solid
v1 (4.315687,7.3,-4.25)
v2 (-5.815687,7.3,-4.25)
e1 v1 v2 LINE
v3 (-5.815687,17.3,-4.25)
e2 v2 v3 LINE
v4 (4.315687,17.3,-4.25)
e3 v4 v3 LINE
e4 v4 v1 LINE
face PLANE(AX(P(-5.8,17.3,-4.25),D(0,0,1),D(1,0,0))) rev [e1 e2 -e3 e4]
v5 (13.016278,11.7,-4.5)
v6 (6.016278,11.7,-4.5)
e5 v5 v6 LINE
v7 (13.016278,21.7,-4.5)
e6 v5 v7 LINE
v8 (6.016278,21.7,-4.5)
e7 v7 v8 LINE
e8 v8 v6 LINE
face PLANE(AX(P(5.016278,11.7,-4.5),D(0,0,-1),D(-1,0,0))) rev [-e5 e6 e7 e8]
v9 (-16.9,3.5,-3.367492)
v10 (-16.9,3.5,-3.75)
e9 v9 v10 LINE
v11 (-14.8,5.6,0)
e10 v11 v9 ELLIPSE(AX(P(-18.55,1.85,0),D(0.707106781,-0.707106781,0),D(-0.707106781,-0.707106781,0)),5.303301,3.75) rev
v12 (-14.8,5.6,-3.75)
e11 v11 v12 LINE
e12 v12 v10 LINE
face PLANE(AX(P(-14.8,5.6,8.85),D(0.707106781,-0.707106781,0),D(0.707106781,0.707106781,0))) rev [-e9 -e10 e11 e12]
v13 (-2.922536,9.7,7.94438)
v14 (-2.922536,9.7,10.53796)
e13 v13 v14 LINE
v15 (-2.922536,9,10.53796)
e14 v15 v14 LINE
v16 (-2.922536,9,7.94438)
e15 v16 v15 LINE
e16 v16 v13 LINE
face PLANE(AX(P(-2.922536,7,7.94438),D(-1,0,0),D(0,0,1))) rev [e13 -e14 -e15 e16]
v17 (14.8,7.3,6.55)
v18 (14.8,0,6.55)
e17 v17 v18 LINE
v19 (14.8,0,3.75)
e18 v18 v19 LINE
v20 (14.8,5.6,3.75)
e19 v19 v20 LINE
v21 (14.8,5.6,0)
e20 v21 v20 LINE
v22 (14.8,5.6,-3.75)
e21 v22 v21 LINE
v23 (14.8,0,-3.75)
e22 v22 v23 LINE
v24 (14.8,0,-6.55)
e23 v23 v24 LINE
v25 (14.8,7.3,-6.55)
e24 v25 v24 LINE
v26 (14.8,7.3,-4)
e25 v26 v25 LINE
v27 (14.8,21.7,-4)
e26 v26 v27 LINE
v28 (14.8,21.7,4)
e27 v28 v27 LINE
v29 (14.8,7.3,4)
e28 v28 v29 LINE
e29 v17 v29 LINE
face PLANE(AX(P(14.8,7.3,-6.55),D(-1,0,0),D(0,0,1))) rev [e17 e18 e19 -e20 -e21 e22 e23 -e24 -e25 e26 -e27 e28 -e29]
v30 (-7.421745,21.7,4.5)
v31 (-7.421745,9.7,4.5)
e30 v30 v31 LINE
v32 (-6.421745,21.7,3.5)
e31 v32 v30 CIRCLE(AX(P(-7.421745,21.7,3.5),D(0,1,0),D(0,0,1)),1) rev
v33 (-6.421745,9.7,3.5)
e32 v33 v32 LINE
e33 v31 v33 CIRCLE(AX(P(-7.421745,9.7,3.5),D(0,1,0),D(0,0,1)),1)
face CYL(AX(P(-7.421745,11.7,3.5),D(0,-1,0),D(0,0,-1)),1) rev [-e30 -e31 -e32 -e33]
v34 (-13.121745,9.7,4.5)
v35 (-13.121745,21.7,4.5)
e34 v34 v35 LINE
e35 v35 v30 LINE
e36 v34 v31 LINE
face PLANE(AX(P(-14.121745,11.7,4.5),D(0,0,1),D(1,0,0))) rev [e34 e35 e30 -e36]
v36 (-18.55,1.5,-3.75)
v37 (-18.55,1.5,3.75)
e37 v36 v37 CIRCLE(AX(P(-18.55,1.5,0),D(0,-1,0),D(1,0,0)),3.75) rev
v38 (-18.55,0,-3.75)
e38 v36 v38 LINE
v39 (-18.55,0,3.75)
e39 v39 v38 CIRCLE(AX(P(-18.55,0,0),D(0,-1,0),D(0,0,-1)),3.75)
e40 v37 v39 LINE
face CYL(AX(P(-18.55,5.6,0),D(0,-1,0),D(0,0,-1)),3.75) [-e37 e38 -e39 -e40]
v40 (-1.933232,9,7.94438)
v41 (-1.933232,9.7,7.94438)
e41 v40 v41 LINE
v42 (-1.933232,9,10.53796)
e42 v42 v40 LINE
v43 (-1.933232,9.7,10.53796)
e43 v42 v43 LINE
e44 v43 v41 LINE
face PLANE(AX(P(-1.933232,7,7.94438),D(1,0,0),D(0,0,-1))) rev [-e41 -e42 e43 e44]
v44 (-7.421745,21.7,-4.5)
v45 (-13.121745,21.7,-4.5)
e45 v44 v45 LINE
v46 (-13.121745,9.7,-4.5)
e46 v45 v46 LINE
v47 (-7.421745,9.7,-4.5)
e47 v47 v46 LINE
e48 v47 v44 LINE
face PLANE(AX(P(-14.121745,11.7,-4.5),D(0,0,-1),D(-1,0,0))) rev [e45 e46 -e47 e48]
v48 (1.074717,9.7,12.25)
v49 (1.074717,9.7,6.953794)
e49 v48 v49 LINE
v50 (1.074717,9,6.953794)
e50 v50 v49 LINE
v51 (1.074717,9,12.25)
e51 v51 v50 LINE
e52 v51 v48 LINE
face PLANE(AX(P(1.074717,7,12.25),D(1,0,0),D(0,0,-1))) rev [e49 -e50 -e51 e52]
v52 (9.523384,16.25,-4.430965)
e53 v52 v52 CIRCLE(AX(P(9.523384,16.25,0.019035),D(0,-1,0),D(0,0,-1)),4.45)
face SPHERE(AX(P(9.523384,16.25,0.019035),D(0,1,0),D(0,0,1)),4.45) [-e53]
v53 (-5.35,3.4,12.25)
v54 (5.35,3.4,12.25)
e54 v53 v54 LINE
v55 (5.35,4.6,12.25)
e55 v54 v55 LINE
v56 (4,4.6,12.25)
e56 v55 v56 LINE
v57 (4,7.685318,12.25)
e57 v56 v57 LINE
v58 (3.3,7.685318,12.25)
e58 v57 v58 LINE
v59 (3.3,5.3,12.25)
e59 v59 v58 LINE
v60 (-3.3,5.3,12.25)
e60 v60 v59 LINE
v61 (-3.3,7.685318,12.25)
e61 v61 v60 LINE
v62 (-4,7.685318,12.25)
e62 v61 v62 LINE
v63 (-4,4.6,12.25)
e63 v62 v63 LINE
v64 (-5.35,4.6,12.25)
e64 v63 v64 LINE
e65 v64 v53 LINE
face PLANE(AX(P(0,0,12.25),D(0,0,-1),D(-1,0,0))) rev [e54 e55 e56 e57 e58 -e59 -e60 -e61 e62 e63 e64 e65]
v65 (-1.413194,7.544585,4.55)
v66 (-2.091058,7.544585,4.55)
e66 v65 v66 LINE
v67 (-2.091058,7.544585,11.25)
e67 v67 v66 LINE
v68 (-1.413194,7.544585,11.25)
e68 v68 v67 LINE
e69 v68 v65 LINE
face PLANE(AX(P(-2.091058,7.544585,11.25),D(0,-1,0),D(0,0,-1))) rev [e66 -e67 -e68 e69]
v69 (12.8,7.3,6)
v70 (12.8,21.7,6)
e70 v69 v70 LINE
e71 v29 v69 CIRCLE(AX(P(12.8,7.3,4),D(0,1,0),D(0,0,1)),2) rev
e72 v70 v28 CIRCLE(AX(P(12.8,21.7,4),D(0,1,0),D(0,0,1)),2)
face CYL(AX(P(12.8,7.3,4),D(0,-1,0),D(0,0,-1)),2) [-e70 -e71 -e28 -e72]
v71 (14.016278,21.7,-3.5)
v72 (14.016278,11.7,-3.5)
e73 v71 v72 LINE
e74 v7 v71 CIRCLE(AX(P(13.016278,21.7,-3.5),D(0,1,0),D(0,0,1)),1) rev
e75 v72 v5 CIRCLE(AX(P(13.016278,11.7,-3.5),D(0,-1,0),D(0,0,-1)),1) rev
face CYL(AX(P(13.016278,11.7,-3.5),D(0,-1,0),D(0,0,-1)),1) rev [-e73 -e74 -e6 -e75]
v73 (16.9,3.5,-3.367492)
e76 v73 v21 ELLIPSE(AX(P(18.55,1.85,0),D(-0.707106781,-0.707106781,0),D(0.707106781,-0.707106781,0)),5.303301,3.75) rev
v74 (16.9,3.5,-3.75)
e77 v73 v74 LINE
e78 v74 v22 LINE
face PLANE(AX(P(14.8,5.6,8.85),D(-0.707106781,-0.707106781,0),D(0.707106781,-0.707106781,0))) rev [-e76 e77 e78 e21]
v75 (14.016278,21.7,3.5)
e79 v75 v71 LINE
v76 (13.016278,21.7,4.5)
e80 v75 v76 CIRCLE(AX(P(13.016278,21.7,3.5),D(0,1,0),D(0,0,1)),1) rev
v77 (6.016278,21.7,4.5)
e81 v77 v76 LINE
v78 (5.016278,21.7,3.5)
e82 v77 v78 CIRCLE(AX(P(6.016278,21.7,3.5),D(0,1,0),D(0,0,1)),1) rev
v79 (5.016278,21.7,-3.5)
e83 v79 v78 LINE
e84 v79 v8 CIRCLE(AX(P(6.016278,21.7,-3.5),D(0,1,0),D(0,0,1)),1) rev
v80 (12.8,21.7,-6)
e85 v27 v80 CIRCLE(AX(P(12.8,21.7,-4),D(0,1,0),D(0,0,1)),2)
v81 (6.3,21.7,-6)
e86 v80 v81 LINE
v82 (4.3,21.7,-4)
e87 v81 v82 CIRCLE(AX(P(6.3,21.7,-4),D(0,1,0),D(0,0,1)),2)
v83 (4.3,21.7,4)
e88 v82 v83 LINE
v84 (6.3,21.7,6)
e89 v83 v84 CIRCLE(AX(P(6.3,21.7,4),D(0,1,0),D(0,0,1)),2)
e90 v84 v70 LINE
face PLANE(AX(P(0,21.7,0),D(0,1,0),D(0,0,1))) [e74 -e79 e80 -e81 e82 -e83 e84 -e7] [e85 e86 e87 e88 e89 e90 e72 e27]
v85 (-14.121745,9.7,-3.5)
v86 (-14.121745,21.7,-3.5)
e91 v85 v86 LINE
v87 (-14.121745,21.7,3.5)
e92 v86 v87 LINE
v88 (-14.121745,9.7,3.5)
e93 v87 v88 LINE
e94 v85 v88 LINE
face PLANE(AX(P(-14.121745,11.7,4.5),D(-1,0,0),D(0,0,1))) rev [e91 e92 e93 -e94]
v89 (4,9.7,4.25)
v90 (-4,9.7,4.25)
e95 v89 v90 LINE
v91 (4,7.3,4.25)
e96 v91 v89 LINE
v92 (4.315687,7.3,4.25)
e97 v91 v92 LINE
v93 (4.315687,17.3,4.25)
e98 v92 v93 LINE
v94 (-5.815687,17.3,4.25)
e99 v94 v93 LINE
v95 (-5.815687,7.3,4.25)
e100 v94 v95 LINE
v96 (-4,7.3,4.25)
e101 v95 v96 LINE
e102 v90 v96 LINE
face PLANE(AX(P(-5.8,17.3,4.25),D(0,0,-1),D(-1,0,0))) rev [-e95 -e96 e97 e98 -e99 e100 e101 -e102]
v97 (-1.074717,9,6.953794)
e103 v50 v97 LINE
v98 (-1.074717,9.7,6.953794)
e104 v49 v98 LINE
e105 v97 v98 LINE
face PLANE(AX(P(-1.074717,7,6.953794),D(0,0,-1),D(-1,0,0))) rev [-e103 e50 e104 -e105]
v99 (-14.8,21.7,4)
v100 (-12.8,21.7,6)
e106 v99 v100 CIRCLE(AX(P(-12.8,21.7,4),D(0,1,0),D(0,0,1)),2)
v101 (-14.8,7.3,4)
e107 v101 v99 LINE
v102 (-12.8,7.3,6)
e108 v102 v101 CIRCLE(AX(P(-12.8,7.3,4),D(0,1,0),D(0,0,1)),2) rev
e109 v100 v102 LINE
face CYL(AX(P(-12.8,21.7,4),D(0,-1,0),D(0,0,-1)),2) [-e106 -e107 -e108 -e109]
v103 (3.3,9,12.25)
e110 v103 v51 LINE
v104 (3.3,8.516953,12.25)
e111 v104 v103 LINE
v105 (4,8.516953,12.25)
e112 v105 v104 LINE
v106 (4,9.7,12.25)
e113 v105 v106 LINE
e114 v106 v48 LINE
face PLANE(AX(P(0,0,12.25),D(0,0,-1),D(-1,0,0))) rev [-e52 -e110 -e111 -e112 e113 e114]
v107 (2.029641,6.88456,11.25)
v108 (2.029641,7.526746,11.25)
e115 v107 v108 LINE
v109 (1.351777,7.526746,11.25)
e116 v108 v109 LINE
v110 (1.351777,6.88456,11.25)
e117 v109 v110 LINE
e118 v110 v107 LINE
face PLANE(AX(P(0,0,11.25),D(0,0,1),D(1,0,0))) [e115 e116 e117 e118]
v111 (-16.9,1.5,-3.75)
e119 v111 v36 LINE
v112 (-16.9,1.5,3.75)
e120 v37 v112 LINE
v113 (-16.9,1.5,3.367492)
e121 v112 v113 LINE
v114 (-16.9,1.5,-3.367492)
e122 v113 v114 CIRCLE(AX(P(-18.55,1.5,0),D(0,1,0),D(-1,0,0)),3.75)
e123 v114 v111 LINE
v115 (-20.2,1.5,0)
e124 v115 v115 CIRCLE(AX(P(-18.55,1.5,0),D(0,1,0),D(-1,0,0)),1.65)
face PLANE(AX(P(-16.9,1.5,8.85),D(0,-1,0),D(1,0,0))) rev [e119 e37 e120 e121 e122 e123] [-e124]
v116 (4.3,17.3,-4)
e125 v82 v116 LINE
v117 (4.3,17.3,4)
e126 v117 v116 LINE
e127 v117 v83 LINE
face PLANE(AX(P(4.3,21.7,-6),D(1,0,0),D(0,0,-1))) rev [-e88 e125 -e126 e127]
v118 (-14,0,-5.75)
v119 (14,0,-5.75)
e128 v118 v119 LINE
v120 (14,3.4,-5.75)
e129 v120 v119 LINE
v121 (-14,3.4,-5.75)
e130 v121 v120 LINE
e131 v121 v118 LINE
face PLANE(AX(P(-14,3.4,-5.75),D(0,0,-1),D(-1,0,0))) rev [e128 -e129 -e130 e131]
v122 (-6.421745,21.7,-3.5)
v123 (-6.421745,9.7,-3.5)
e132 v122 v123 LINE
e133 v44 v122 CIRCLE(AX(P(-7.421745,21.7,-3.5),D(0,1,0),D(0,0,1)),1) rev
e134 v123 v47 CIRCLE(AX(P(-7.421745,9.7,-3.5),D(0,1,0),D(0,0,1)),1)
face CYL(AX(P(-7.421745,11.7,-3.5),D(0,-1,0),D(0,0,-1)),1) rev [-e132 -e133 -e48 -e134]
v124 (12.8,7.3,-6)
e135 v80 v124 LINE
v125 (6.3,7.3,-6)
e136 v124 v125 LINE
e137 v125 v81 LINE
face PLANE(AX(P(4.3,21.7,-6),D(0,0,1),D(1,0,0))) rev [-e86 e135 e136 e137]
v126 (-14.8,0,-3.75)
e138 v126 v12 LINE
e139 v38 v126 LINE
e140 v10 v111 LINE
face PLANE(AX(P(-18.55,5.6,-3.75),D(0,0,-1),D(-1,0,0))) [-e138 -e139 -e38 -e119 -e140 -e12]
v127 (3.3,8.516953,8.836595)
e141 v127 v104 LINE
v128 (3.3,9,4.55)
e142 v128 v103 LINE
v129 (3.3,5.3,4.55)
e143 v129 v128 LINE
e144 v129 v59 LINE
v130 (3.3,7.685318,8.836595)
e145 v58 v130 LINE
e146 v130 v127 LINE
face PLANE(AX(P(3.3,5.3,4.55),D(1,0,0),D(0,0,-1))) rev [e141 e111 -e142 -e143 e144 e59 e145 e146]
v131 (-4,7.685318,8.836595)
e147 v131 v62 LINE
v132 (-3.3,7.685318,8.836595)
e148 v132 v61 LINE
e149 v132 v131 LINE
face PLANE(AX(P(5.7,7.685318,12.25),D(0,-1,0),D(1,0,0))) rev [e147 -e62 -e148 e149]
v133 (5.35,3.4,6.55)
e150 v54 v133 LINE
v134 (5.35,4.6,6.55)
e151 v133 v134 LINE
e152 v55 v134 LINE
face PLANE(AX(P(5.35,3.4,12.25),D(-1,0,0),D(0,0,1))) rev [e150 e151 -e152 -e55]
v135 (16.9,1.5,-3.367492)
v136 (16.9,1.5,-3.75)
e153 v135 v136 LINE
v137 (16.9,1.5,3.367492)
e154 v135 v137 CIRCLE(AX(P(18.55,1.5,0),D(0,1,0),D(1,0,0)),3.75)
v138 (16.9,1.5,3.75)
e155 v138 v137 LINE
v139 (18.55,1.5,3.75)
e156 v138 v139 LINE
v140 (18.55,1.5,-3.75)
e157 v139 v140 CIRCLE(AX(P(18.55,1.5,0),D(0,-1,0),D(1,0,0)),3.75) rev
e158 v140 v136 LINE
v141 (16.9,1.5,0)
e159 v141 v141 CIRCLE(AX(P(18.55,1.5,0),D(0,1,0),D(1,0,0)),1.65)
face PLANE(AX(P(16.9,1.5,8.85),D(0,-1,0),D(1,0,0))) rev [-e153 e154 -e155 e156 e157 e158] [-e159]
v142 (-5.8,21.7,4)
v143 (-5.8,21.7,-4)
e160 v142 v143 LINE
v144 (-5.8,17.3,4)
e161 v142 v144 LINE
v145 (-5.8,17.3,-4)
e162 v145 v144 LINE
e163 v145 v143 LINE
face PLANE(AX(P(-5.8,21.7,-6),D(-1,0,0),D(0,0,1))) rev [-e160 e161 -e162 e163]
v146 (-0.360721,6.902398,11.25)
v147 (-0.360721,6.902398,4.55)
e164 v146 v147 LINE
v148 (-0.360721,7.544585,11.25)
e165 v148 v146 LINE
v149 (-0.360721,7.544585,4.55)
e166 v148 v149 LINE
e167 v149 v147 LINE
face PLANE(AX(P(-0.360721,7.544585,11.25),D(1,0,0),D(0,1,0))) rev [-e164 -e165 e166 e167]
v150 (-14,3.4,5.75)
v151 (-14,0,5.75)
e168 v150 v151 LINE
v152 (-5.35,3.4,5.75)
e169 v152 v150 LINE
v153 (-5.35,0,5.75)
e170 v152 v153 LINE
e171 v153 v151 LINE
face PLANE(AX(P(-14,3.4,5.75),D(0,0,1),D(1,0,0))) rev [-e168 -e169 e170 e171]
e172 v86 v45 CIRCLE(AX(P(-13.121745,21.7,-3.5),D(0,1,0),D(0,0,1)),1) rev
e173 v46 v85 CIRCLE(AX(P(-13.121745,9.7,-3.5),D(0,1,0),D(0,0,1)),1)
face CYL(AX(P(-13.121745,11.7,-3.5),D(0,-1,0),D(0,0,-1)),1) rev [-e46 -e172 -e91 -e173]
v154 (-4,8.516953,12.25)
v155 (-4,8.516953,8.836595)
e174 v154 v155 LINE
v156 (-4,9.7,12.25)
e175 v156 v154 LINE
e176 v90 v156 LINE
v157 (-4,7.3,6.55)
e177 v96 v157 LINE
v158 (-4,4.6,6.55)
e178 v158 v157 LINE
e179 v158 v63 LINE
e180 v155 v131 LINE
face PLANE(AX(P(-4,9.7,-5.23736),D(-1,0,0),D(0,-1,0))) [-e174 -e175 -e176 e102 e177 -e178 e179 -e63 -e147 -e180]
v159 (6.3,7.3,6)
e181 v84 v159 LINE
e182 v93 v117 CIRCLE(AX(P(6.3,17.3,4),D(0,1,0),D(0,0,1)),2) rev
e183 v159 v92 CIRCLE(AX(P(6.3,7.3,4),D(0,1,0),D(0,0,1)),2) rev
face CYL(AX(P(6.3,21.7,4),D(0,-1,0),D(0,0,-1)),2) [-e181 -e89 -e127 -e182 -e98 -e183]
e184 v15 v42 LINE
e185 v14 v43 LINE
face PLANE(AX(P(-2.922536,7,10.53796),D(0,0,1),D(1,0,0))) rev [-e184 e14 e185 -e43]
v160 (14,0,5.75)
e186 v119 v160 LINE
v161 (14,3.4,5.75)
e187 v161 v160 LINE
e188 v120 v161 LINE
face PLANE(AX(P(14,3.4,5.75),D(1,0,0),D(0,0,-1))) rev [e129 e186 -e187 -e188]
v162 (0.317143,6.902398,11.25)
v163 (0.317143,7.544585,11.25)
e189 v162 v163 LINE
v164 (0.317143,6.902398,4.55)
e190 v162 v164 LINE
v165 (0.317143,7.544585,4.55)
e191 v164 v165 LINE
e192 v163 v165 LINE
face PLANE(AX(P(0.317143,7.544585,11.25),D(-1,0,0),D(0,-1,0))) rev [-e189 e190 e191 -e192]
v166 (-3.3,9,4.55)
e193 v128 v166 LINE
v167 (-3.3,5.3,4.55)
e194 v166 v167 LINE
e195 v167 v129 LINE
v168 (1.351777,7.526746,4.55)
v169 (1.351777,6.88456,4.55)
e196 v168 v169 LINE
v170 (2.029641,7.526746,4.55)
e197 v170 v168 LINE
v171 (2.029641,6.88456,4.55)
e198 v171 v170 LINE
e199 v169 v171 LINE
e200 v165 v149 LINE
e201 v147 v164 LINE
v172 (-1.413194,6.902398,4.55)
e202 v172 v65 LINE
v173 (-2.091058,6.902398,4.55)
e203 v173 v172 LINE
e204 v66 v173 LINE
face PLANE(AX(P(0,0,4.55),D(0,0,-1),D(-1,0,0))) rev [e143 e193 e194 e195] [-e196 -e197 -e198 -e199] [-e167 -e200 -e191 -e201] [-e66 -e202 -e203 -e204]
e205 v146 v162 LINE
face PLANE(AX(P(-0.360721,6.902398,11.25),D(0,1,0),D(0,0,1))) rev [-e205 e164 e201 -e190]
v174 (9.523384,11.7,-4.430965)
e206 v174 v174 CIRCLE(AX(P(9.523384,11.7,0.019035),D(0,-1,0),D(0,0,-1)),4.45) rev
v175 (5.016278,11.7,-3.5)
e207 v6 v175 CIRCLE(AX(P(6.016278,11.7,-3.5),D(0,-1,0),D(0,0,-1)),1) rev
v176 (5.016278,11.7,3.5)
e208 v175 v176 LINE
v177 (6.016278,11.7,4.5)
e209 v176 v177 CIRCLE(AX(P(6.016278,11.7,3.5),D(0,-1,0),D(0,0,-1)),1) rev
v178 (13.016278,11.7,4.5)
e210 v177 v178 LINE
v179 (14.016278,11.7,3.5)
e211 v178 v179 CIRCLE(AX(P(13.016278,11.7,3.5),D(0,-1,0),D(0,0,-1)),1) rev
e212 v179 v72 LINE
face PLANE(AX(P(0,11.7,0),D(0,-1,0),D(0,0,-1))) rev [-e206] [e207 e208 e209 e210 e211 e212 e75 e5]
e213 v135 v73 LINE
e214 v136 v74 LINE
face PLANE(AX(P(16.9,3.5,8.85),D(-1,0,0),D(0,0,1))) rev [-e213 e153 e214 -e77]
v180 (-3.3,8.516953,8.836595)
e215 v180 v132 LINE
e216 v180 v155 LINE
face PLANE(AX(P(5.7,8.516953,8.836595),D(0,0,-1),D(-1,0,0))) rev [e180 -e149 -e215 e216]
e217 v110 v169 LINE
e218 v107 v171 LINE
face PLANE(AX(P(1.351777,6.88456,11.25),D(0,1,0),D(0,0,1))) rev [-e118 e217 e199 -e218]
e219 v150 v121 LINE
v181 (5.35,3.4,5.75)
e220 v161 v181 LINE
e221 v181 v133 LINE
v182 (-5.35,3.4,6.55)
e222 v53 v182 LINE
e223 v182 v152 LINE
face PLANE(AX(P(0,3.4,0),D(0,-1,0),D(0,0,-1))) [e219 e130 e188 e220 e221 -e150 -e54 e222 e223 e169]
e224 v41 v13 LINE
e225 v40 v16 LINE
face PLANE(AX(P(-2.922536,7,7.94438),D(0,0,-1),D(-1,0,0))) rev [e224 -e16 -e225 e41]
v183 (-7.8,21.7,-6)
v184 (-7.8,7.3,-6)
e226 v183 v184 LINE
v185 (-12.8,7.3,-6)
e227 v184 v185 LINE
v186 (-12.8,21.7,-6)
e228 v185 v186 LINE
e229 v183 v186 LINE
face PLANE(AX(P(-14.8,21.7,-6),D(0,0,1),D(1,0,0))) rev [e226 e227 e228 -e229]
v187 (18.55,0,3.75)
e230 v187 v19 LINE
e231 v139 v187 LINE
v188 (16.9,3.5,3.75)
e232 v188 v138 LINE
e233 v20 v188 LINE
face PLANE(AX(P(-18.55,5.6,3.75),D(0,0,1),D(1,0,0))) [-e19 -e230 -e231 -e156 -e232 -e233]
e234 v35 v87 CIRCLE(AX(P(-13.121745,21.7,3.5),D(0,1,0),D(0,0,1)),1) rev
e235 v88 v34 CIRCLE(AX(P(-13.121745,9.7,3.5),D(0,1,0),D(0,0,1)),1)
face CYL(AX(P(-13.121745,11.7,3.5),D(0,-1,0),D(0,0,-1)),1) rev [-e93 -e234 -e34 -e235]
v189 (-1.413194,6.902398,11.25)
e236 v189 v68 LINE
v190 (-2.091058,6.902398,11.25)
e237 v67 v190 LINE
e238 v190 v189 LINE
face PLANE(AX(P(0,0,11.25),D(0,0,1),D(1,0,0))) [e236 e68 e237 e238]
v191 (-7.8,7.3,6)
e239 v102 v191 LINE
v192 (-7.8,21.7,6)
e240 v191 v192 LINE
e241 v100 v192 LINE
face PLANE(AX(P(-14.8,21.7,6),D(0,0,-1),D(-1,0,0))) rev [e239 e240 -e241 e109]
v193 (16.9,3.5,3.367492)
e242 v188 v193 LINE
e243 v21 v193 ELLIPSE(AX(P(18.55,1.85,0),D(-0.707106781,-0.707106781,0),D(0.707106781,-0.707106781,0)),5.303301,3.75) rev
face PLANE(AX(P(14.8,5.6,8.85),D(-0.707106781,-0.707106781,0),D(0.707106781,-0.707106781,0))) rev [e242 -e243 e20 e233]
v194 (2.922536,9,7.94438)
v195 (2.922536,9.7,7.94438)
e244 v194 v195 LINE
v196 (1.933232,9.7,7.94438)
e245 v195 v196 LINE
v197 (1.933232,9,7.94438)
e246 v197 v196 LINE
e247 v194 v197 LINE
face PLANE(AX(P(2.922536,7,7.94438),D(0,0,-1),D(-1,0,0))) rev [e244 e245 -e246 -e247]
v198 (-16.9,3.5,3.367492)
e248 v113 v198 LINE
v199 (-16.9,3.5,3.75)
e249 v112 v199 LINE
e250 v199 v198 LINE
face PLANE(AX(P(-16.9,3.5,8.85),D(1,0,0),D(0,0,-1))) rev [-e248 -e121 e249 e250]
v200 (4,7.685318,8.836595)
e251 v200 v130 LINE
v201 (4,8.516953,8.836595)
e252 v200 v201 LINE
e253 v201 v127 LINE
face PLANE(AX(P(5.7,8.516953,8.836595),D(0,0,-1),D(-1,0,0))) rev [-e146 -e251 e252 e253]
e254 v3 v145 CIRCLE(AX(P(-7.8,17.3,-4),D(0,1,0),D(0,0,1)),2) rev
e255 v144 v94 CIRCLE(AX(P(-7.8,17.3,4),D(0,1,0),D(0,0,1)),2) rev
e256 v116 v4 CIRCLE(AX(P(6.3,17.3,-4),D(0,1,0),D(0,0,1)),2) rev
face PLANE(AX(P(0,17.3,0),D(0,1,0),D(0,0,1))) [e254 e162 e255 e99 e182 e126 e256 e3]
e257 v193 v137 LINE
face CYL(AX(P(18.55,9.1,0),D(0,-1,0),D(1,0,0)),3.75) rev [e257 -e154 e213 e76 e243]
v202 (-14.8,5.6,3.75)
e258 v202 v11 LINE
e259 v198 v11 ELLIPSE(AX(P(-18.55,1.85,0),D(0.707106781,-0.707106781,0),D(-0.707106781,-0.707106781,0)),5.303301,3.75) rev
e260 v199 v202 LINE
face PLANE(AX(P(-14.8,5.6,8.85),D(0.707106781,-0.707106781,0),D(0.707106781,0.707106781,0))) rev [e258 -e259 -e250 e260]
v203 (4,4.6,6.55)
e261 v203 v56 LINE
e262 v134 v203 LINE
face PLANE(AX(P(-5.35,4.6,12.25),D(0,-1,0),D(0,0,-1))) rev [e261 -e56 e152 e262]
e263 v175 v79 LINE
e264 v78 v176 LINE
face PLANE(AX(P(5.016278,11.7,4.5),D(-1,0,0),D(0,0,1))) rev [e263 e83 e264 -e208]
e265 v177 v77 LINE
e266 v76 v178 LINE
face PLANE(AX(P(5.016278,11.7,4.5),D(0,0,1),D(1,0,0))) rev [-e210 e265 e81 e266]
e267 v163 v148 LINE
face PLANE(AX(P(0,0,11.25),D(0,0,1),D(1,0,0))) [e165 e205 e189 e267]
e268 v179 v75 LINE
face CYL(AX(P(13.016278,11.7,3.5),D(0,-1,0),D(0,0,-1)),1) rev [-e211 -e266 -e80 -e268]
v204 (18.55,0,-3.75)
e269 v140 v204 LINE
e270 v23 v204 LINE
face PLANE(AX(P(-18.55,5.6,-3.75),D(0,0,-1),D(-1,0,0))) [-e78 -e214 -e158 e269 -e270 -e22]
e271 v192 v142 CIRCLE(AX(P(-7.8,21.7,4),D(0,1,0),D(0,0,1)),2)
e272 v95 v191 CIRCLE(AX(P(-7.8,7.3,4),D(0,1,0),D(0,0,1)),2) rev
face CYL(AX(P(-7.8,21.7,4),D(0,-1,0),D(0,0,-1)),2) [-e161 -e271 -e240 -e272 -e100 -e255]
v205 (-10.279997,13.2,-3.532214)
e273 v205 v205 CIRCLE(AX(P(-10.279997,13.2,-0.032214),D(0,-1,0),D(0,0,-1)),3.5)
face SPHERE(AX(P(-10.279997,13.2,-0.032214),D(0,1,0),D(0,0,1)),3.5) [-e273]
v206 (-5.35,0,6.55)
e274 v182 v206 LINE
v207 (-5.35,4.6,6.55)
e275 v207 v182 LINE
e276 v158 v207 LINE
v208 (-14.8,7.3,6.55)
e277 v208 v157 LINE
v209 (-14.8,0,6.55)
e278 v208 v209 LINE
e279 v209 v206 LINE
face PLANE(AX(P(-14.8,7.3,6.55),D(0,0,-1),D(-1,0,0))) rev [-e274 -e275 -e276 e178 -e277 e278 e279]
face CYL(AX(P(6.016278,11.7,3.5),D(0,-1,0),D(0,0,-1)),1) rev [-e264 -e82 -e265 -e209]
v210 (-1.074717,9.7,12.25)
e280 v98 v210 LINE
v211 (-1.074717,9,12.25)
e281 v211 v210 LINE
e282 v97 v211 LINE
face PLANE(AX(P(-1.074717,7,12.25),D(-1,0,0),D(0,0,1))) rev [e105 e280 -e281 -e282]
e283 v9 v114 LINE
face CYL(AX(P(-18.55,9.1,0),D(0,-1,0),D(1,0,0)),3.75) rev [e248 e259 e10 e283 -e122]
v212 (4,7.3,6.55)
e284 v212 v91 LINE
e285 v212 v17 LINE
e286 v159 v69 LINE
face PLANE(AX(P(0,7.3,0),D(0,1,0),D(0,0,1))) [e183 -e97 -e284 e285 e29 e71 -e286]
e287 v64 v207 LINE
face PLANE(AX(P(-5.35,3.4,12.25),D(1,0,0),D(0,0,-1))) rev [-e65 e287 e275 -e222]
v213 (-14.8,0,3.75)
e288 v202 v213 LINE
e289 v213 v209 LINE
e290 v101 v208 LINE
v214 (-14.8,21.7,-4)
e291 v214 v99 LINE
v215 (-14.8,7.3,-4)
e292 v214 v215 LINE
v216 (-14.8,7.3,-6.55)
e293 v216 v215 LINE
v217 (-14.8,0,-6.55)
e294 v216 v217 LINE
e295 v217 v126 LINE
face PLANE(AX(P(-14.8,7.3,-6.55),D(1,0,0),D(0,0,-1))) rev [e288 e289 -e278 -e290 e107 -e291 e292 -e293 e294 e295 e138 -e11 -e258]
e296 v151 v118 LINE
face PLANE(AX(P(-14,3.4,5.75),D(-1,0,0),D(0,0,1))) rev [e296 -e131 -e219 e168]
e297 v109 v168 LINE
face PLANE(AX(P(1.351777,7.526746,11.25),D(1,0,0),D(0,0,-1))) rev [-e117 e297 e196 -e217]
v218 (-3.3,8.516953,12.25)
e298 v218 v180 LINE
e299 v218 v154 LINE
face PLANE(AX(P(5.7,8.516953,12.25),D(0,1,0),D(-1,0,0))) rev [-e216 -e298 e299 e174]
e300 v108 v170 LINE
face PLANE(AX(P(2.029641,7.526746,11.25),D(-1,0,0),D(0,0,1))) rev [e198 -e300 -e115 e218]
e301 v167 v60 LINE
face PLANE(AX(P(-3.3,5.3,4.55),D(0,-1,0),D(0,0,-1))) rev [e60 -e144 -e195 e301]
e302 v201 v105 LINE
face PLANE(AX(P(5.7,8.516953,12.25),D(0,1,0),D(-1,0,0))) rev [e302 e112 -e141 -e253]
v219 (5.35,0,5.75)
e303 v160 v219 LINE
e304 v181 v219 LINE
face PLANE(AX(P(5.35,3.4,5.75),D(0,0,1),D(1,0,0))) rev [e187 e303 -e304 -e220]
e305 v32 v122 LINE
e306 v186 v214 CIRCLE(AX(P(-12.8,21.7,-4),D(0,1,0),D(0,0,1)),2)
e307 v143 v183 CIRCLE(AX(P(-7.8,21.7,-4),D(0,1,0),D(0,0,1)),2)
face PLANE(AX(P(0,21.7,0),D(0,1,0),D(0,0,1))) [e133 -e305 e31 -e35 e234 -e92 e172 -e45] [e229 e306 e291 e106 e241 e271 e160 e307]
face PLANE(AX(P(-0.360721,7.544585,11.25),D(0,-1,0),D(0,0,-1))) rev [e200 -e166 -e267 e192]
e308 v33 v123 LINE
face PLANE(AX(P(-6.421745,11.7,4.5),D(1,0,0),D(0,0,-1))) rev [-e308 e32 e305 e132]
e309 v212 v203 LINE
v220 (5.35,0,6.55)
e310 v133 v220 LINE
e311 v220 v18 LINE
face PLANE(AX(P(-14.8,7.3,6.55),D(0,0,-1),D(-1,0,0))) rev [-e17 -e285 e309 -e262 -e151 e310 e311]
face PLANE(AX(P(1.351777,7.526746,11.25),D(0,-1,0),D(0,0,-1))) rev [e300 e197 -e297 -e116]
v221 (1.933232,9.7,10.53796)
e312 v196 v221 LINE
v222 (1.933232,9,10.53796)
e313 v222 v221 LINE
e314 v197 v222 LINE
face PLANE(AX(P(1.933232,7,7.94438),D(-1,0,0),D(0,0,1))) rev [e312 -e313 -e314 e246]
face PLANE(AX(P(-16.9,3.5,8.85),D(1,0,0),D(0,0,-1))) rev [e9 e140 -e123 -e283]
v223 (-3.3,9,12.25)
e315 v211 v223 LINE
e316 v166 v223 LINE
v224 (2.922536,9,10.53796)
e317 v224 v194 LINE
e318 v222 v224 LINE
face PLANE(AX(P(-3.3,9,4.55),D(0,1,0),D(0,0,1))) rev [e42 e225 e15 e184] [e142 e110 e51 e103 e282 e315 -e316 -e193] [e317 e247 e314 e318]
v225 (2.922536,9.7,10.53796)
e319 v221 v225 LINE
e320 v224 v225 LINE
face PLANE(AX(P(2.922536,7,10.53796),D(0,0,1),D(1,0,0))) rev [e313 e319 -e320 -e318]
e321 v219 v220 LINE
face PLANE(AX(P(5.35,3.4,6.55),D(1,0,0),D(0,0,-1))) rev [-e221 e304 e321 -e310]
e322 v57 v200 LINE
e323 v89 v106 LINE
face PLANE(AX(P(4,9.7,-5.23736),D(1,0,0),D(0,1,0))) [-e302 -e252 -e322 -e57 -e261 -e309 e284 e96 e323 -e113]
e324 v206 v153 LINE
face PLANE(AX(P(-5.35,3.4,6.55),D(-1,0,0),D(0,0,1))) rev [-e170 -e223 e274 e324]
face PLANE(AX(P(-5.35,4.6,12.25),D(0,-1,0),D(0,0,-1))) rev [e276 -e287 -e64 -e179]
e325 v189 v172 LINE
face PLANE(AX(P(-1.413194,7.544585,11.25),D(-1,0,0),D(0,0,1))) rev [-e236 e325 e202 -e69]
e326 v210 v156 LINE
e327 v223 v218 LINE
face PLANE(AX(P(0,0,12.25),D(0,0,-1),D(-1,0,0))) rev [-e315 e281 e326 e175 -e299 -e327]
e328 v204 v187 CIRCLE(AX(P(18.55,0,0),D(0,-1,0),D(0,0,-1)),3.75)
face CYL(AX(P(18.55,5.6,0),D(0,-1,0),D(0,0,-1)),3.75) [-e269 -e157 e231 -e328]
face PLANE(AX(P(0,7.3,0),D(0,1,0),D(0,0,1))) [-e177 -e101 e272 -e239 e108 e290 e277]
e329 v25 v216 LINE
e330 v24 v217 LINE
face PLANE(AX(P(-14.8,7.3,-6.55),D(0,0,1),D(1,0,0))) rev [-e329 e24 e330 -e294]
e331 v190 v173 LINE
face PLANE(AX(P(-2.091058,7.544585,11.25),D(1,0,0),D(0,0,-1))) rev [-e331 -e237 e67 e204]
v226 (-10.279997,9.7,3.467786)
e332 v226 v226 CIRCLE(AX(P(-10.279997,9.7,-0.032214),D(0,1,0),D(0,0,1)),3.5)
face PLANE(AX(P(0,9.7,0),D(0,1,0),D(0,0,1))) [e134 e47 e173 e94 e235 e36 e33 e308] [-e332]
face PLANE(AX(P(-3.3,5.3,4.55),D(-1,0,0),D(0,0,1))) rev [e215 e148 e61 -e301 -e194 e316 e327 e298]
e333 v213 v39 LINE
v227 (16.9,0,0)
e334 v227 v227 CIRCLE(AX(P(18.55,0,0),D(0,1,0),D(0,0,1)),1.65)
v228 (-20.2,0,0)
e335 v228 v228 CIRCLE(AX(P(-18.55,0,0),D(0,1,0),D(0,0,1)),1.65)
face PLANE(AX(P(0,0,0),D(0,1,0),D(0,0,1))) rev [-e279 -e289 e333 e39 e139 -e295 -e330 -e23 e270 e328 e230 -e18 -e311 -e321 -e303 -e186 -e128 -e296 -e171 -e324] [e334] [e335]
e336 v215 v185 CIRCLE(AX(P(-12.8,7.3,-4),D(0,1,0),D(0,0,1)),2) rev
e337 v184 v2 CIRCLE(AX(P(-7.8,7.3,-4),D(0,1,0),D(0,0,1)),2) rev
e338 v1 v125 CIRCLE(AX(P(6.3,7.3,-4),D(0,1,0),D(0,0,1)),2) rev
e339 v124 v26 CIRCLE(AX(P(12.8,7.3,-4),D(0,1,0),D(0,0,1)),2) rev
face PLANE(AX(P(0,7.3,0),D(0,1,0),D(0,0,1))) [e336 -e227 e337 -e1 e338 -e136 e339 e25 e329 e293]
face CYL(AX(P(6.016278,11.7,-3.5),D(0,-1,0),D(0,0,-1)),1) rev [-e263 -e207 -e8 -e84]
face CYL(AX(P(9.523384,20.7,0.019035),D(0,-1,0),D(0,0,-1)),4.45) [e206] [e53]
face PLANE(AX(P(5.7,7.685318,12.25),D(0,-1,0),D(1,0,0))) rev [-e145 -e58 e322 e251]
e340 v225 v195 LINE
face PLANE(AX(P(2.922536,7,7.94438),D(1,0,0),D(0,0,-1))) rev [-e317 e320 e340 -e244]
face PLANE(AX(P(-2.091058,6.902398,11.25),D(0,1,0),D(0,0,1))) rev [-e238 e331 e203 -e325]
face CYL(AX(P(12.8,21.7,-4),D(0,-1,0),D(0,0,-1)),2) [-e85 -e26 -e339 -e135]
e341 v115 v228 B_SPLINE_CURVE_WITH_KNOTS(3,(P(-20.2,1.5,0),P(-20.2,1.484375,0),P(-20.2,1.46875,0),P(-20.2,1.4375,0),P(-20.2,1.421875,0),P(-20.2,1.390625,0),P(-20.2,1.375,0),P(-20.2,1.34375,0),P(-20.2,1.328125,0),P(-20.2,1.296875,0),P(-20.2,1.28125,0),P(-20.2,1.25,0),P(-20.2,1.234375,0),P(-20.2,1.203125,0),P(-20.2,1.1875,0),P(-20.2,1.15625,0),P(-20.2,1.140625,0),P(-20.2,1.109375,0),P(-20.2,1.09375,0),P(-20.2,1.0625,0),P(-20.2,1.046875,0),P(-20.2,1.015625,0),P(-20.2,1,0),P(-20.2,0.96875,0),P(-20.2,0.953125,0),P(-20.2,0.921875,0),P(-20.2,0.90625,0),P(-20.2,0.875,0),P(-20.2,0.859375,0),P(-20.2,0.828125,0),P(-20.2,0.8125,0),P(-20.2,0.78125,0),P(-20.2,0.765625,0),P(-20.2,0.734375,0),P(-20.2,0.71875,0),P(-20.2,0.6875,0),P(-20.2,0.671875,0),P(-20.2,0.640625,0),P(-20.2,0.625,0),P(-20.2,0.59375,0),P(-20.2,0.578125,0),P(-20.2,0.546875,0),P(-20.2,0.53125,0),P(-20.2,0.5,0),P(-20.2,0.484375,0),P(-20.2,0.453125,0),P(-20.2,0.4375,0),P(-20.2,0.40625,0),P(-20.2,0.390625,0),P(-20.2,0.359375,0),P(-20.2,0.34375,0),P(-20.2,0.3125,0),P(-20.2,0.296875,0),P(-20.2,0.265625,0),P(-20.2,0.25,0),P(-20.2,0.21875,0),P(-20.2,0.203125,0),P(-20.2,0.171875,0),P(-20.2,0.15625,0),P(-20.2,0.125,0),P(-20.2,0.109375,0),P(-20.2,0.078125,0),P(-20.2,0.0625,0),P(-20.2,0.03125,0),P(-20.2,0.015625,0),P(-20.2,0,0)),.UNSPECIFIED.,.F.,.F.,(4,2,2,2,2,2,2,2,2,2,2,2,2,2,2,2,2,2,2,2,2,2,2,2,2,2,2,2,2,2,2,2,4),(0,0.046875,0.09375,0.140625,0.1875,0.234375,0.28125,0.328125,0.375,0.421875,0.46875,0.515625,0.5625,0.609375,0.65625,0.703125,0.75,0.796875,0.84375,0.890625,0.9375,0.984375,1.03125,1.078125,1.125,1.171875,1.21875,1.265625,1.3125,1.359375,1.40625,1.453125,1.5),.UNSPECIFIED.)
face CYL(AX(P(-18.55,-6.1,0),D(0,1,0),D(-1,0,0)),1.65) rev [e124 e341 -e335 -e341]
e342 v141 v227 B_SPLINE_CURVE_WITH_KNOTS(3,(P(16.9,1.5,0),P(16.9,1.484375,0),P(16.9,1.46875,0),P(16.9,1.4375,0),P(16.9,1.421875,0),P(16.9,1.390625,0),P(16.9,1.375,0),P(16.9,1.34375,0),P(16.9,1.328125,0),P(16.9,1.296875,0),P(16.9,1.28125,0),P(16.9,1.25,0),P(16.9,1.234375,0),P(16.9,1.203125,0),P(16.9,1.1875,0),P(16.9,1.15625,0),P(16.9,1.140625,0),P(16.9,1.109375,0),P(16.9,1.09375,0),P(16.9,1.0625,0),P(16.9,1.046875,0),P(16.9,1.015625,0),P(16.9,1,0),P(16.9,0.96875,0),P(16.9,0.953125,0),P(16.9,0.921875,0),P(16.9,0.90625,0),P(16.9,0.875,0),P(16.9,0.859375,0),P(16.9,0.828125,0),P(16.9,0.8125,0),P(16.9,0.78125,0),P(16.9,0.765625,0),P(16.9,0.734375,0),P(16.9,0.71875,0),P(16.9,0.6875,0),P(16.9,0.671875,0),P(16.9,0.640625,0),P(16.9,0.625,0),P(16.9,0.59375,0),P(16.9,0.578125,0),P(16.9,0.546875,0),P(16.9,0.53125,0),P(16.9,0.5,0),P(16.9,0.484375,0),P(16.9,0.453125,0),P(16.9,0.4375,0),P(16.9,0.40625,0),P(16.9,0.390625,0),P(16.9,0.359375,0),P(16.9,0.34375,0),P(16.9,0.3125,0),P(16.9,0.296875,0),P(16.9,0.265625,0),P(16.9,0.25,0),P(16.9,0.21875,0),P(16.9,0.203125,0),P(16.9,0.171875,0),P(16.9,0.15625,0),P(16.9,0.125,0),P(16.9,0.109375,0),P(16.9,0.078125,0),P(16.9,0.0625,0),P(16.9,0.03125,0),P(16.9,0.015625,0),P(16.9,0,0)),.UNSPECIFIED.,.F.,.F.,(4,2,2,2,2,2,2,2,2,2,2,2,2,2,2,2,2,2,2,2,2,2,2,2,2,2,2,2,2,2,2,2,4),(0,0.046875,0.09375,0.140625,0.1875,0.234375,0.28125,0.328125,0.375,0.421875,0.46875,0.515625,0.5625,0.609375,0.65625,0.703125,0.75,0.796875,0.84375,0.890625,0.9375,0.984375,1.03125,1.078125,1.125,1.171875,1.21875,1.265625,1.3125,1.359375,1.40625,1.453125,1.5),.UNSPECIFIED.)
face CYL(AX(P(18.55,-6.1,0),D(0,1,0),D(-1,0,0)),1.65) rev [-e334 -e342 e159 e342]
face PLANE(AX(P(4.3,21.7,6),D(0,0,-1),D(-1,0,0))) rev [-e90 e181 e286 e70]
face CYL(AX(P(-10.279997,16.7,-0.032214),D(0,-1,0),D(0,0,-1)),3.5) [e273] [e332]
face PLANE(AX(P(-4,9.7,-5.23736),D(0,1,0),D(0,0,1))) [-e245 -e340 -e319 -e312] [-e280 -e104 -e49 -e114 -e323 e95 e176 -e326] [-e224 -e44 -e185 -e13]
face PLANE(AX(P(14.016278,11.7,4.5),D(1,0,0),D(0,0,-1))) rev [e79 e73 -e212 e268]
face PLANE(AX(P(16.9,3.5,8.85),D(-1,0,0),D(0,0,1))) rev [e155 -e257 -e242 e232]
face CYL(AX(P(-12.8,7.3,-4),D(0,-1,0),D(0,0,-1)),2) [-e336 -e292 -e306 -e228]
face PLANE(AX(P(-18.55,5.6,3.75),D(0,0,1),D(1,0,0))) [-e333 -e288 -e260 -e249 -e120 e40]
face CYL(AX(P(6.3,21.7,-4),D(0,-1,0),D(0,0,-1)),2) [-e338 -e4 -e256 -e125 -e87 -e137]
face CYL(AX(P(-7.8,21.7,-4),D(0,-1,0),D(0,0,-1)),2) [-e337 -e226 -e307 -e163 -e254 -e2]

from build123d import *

# Parameters (mm, degrees)
SKETCH_1_W           = 29.6
SKETCH_1_H           = 13.1
EXTRUDE_1_DEPTH      = 7.3
SKETCH_2_W           = 10.5
SKETCH_2_H           = 12
SKETCH_2_W_2         = 9
EXTRUDE_2_DEPTH      = 14.4
SKETCH_3_W           = 10.1
SKETCH_3_H           = 8.5
EXTRUDE_3_DEPTH      = 10
FILLET_1_R           = 2
SKETCH_4_W           = 9
SKETCH_4_H           = 9
SKETCH_4_W_2         = 7.7
CUT_EXTRUDE_2_DEPTH  = 10
EXTRUDE_4_DEPTH      = 5.6
CUT_EXTRUDE_3_DEPTH  = 12.6
SKETCH_8_R           = 3.75
CUT_EXTRUDE_4_DEPTH  = 7.6
SKETCH_9_R           = 1.65
CUT_EXTRUDE_5_DEPTH  = 7.6
CUT_EXTRUDE_6_DEPTH  = 3.4
SKETCH_11_W          = 10.7
SKETCH_11_H          = 1.2
EXTRUDE_5_DEPTH      = 5.7
EXTRUDE_6_REACH      = 38.354
SKETCH_12_W          = 8
SKETCH_12_H          = 5.1
SKETCH_13_W          = 6.6
SKETCH_13_H          = 3.7
CUT_EXTRUDE_7_DEPTH  = 7.7
SKETCH_14_W          = 3.413404973
SKETCH_14_H          = 0.831634307
CUT_EXTRUDE_8_DEPTH  = 9.7
SKETCH_15_W          = 0.989303902
SKETCH_15_H          = 2.593580499
SKETCH_15_W_2        = 2.149434462
SKETCH_15_H_2        = 5.296205569
CUT_EXTRUDE_9_DEPTH  = 2.7
SKETCH_16_W          = 0.67786387
SKETCH_16_H          = 0.642186824
SKETCH_16_W_2        = 0.677863869
SKETCH_16_H_2        = 0.642186825
EXTRUDE_7_DEPTH      = 6.7
SKETCH_17_R          = 4.45
EXTRUDE_8_DEPTH      = 9
FILLET_3_R           = 4.45
FILLET_4_R           = 1
SKETCH_18_W          = 7.7
SKETCH_18_H          = 9
CUT_EXTRUDE_10_DEPTH = 2
SKETCH_19_R          = 3.5
EXTRUDE_9_DEPTH      = 7
FILLET_6_R           = 3.5
FILLET_7_R           = 1


with BuildPart() as part:
    # 草图1 → 凸台-拉伸1 (new body)
    with BuildSketch(Plane(origin=(0, 0, 0), x_dir=(1, 0, 0), z_dir=(0, 1, 0))):
        Rectangle(SKETCH_1_W, SKETCH_1_H)
    extrude(amount=EXTRUDE_1_DEPTH)

    # 草图2 → 凸台-拉伸2 (add)
    with BuildSketch(Plane(origin=(0, 7.3, 0), x_dir=(1, 0, 0), z_dir=(0, 1, 0))):
        with Locations((9.55, 0)):
            Rectangle(SKETCH_2_W, SKETCH_2_H)
        with Locations((-10.3, 0)):
            Rectangle(SKETCH_2_W_2, SKETCH_2_H)
    extrude(amount=EXTRUDE_2_DEPTH)

    # 草图3 → 凸台-拉伸3 (add)
    with BuildSketch(Plane(origin=(0, 7.3, 0), x_dir=(1, 0, 0), z_dir=(0, 1, 0))):
        with Locations((-0.75, 0)):
            Rectangle(SKETCH_3_W, SKETCH_3_H)
    extrude(amount=EXTRUDE_3_DEPTH)

    # 圆角1
    # the kernel refuses this fillet: 2 mm, written as the material it takes off along each edge
    with BuildSketch(Plane(origin=(14.8, 7.3, 6), x_dir=(0, 0, -1), z_dir=(0, 1, 0)), Plane(origin=(-14.8, 7.3, -6), x_dir=(0, 0, 1), z_dir=(0, 1, 0))) as fillet_1_piece_1:
        with BuildLine():
            CenterArc((FILLET_1_R, FILLET_1_R), FILLET_1_R, 180, 90)
            Line((0, FILLET_1_R), (0, 0))
            Line((0, 0), (FILLET_1_R, 0))
        make_face()
    extrude(amount=19.4, mode=Mode.SUBTRACT)
    with BuildSketch(Plane(origin=(4.3, 7.3, 6), x_dir=(1, 0, 0), z_dir=(0, 1, 0))) as fillet_1_piece_2_section:
        with BuildLine():
            CenterArc((FILLET_1_R, FILLET_1_R), FILLET_1_R, 180, 90)
            Line((0, FILLET_1_R), (0, 0))
            Line((0, 0), (FILLET_1_R, 0))
        make_face()
    fillet_1_piece_2 = extrude(amount=19.4, mode=Mode.PRIVATE)
    fillet_1_piece_2 = split(fillet_1_piece_2, bisect_by=Plane(origin=(4.75805712, 12.3, 4.25), z_dir=(0, 0, 1)), keep=Keep.TOP, mode=Mode.PRIVATE)
    fillet_1_piece_2 = split(fillet_1_piece_2, bisect_by=Plane(origin=(4.75805712, 17.3, 5.563068428), z_dir=(0, -1, 0)), keep=Keep.TOP, mode=Mode.PRIVATE)
    add(fillet_1_piece_2, mode=Mode.SUBTRACT)
    with BuildSketch(Plane(origin=(4.3, 7.3, 6), x_dir=(1, 0, 0), z_dir=(0, 1, 0))) as fillet_1_piece_3_section:
        with BuildLine():
            CenterArc((FILLET_1_R, FILLET_1_R), FILLET_1_R, 180, 90)
            Line((0, FILLET_1_R), (0, 0))
            Line((0, 0), (FILLET_1_R, 0))
        make_face()
    fillet_1_piece_3 = extrude(amount=19.4, mode=Mode.PRIVATE)
    fillet_1_piece_3 = split(fillet_1_piece_3, bisect_by=Plane(origin=(4.75805712, 22, 4.25), z_dir=(0, 0, 1)), keep=Keep.TOP, mode=Mode.PRIVATE)
    fillet_1_piece_3 = split(fillet_1_piece_3, bisect_by=Plane(origin=(4.75805712, 17.3, 5.563068428), z_dir=(0, 1, 0)), keep=Keep.TOP, mode=Mode.PRIVATE)
    add(fillet_1_piece_3, mode=Mode.SUBTRACT)
    with BuildSketch(Plane(origin=(4.3, 7.3, 6), x_dir=(1, 0, 0), z_dir=(0, 1, 0))) as fillet_1_piece_4_section:
        with BuildLine():
            CenterArc((FILLET_1_R, FILLET_1_R), FILLET_1_R, 180, 90)
            Line((0, FILLET_1_R), (0, 0))
            Line((0, 0), (FILLET_1_R, 0))
        make_face()
    fillet_1_piece_4 = extrude(amount=19.4, mode=Mode.PRIVATE)
    fillet_1_piece_4 = split(fillet_1_piece_4, bisect_by=Plane(origin=(4.282851875, 22, 4.25), z_dir=(0, 0, -1)), keep=Keep.TOP, mode=Mode.PRIVATE)
    fillet_1_piece_4 = split(fillet_1_piece_4, bisect_by=Plane(origin=(4.282851875, 17.3, 4.132221144), z_dir=(0, 1, 0)), keep=Keep.TOP, mode=Mode.PRIVATE)
    add(fillet_1_piece_4, mode=Mode.SUBTRACT)
    with BuildSketch(Plane(origin=(14.8, 7.3, -6), x_dir=(0, 0, 1), z_dir=(0, 1, 0)), Plane(origin=(-14.8, 7.3, 6), x_dir=(0, 0, -1), z_dir=(0, 1, 0))) as fillet_1_piece_5:
        with BuildLine():
            CenterArc((FILLET_1_R, -FILLET_1_R), FILLET_1_R, 90, 90)
            Line((0, -FILLET_1_R), (0, 0))
            Line((0, 0), (FILLET_1_R, 0))
        make_face()
    extrude(amount=19.4, mode=Mode.SUBTRACT)
    with BuildSketch(Plane(origin=(4.3, 7.3, -6), x_dir=(1, 0, 0), z_dir=(0, 1, 0))) as fillet_1_piece_6_section:
        with BuildLine():
            CenterArc((FILLET_1_R, -FILLET_1_R), FILLET_1_R, 90, 90)
            Line((0, -FILLET_1_R), (0, 0))
            Line((0, 0), (FILLET_1_R, 0))
        make_face()
    fillet_1_piece_6 = extrude(amount=19.4, mode=Mode.PRIVATE)
    fillet_1_piece_6 = split(fillet_1_piece_6, bisect_by=Plane(origin=(4.75805712, 12.3, -4.25), z_dir=(0, 0, -1)), keep=Keep.TOP, mode=Mode.PRIVATE)
    fillet_1_piece_6 = split(fillet_1_piece_6, bisect_by=Plane(origin=(4.75805712, 17.3, -5.563068428), z_dir=(0, -1, 0)), keep=Keep.TOP, mode=Mode.PRIVATE)
    add(fillet_1_piece_6, mode=Mode.SUBTRACT)
    with BuildSketch(Plane(origin=(4.3, 7.3, -6), x_dir=(1, 0, 0), z_dir=(0, 1, 0))) as fillet_1_piece_7_section:
        with BuildLine():
            CenterArc((FILLET_1_R, -FILLET_1_R), FILLET_1_R, 90, 90)
            Line((0, -FILLET_1_R), (0, 0))
            Line((0, 0), (FILLET_1_R, 0))
        make_face()
    fillet_1_piece_7 = extrude(amount=19.4, mode=Mode.PRIVATE)
    fillet_1_piece_7 = split(fillet_1_piece_7, bisect_by=Plane(origin=(4.75805712, 22, -4.25), z_dir=(0, 0, -1)), keep=Keep.TOP, mode=Mode.PRIVATE)
    fillet_1_piece_7 = split(fillet_1_piece_7, bisect_by=Plane(origin=(4.75805712, 17.3, -5.563068428), z_dir=(0, 1, 0)), keep=Keep.TOP, mode=Mode.PRIVATE)
    add(fillet_1_piece_7, mode=Mode.SUBTRACT)
    with BuildSketch(Plane(origin=(4.3, 7.3, -6), x_dir=(1, 0, 0), z_dir=(0, 1, 0))) as fillet_1_piece_8_section:
        with BuildLine():
            CenterArc((FILLET_1_R, -FILLET_1_R), FILLET_1_R, 90, 90)
            Line((0, -FILLET_1_R), (0, 0))
            Line((0, 0), (FILLET_1_R, 0))
        make_face()
    fillet_1_piece_8 = extrude(amount=19.4, mode=Mode.PRIVATE)
    fillet_1_piece_8 = split(fillet_1_piece_8, bisect_by=Plane(origin=(4.282851875, 22, -4.25), z_dir=(0, 0, 1)), keep=Keep.TOP, mode=Mode.PRIVATE)
    fillet_1_piece_8 = split(fillet_1_piece_8, bisect_by=Plane(origin=(4.282851875, 17.3, -4.132221144), z_dir=(0, 1, 0)), keep=Keep.TOP, mode=Mode.PRIVATE)
    add(fillet_1_piece_8, mode=Mode.SUBTRACT)
    with BuildSketch(Plane(origin=(-5.8, 7.3, -6), x_dir=(-1, 0, 0), z_dir=(0, 1, 0))) as fillet_1_piece_9_section:
        with BuildLine():
            CenterArc((FILLET_1_R, FILLET_1_R), FILLET_1_R, 180, 90)
            Line((0, FILLET_1_R), (0, 0))
            Line((0, 0), (FILLET_1_R, 0))
        make_face()
    fillet_1_piece_9 = extrude(amount=19.4, mode=Mode.PRIVATE)
    fillet_1_piece_9 = split(fillet_1_piece_9, bisect_by=Plane(origin=(-6.25805712, 12.3, -4.25), z_dir=(0, 0, -1)), keep=Keep.TOP, mode=Mode.PRIVATE)
    fillet_1_piece_9 = split(fillet_1_piece_9, bisect_by=Plane(origin=(-6.25805712, 17.3, -5.563068428), z_dir=(0, -1, 0)), keep=Keep.TOP, mode=Mode.PRIVATE)
    add(fillet_1_piece_9, mode=Mode.SUBTRACT)
    with BuildSketch(Plane(origin=(-5.8, 7.3, -6), x_dir=(-1, 0, 0), z_dir=(0, 1, 0))) as fillet_1_piece_10_section:
        with BuildLine():
            CenterArc((FILLET_1_R, FILLET_1_R), FILLET_1_R, 180, 90)
            Line((0, FILLET_1_R), (0, 0))
            Line((0, 0), (FILLET_1_R, 0))
        make_face()
    fillet_1_piece_10 = extrude(amount=19.4, mode=Mode.PRIVATE)
    fillet_1_piece_10 = split(fillet_1_piece_10, bisect_by=Plane(origin=(-6.25805712, 22, -4.25), z_dir=(0, 0, -1)), keep=Keep.TOP, mode=Mode.PRIVATE)
    fillet_1_piece_10 = split(fillet_1_piece_10, bisect_by=Plane(origin=(-6.25805712, 17.3, -5.563068428), z_dir=(0, 1, 0)), keep=Keep.TOP, mode=Mode.PRIVATE)
    add(fillet_1_piece_10, mode=Mode.SUBTRACT)
    with BuildSketch(Plane(origin=(-5.8, 7.3, -6), x_dir=(-1, 0, 0), z_dir=(0, 1, 0))) as fillet_1_piece_11_section:
        with BuildLine():
            CenterArc((FILLET_1_R, FILLET_1_R), FILLET_1_R, 180, 90)
            Line((0, FILLET_1_R), (0, 0))
            Line((0, 0), (FILLET_1_R, 0))
        make_face()
    fillet_1_piece_11 = extrude(amount=19.4, mode=Mode.PRIVATE)
    fillet_1_piece_11 = split(fillet_1_piece_11, bisect_by=Plane(origin=(-5.782851875, 22, -4.25), z_dir=(0, 0, 1)), keep=Keep.TOP, mode=Mode.PRIVATE)
    fillet_1_piece_11 = split(fillet_1_piece_11, bisect_by=Plane(origin=(-5.782851875, 17.3, -4.132221144), z_dir=(0, 1, 0)), keep=Keep.TOP, mode=Mode.PRIVATE)
    add(fillet_1_piece_11, mode=Mode.SUBTRACT)
    with BuildSketch(Plane(origin=(-5.8, 7.3, 6), x_dir=(-1, 0, 0), z_dir=(0, 1, 0))) as fillet_1_piece_12_section:
        with BuildLine():
            CenterArc((FILLET_1_R, -FILLET_1_R), FILLET_1_R, 90, 90)
            Line((0, -FILLET_1_R), (0, 0))
            Line((0, 0), (FILLET_1_R, 0))
        make_face()
    fillet_1_piece_12 = extrude(amount=19.4, mode=Mode.PRIVATE)
    fillet_1_piece_12 = split(fillet_1_piece_12, bisect_by=Plane(origin=(-6.25805712, 17.3, 5.563068428), z_dir=(0, -1, 0)), keep=Keep.TOP, mode=Mode.PRIVATE)
    fillet_1_piece_12 = split(fillet_1_piece_12, bisect_by=Plane(origin=(-6.25805712, 12.3, 4.25), z_dir=(0, 0, 1)), keep=Keep.TOP, mode=Mode.PRIVATE)
    add(fillet_1_piece_12, mode=Mode.SUBTRACT)
    with BuildSketch(Plane(origin=(-5.8, 7.3, 6), x_dir=(-1, 0, 0), z_dir=(0, 1, 0))) as fillet_1_piece_13_section:
        with BuildLine():
            CenterArc((FILLET_1_R, -FILLET_1_R), FILLET_1_R, 90, 90)
            Line((0, -FILLET_1_R), (0, 0))
            Line((0, 0), (FILLET_1_R, 0))
        make_face()
    fillet_1_piece_13 = extrude(amount=19.4, mode=Mode.PRIVATE)
    fillet_1_piece_13 = split(fillet_1_piece_13, bisect_by=Plane(origin=(-6.25805712, 17.3, 5.563068428), z_dir=(0, 1, 0)), keep=Keep.TOP, mode=Mode.PRIVATE)
    fillet_1_piece_13 = split(fillet_1_piece_13, bisect_by=Plane(origin=(-6.25805712, 22, 4.25), z_dir=(0, 0, 1)), keep=Keep.TOP, mode=Mode.PRIVATE)
    add(fillet_1_piece_13, mode=Mode.SUBTRACT)
    with BuildSketch(Plane(origin=(-5.8, 7.3, 6), x_dir=(-1, 0, 0), z_dir=(0, 1, 0))) as fillet_1_piece_14_section:
        with BuildLine():
            CenterArc((FILLET_1_R, -FILLET_1_R), FILLET_1_R, 90, 90)
            Line((0, -FILLET_1_R), (0, 0))
            Line((0, 0), (FILLET_1_R, 0))
        make_face()
    fillet_1_piece_14 = extrude(amount=19.4, mode=Mode.PRIVATE)
    fillet_1_piece_14 = split(fillet_1_piece_14, bisect_by=Plane(origin=(-5.782851875, 17.3, 4.132221144), z_dir=(0, 1, 0)), keep=Keep.TOP, mode=Mode.PRIVATE)
    fillet_1_piece_14 = split(fillet_1_piece_14, bisect_by=Plane(origin=(-5.782851875, 22, 4.25), z_dir=(0, 0, -1)), keep=Keep.TOP, mode=Mode.PRIVATE)
    add(fillet_1_piece_14, mode=Mode.SUBTRACT)

    # 草图4 → 切除-拉伸2 (cut)
    with BuildSketch(Plane(origin=(0, 21.7, 0), x_dir=(1, 0, 0), z_dir=(0, 1, 0))):
        with Locations((9.516278165, 0)):
            Rectangle(SKETCH_4_W, SKETCH_4_H)
        with Locations((-10.271744936, 0)):
            Rectangle(SKETCH_4_W_2, SKETCH_4_H)
    extrude(amount=-CUT_EXTRUDE_2_DEPTH, mode=Mode.SUBTRACT)

    # 草图5 → 凸台-拉伸4 (add)
    with BuildSketch(Plane.XZ):
        with BuildLine():
            Line((-18.55, 3.75), (18.55, 3.75))
            ThreePointArc((18.55, 3.75), (22.3, 0), (18.55, -3.75))
            Line((18.55, -3.75), (-18.55, -3.75))
            ThreePointArc((-18.55, -3.75), (-22.3, 0), (-18.55, 3.75))
        make_face()
    extrude(amount=-EXTRUDE_4_DEPTH)

    # 草图6 → 切除-拉伸3 (cut)
    with BuildSketch(Plane(origin=(0, 0, -3.75), x_dir=(-1, 0, 0), z_dir=(0, 0, -1))):
        Polygon((-14.8, 5.6), (-16.9, 3.5), (-16.9, 1.5), (-22.3, 1.5), (-22.3, 5.6), align=None)
        Polygon((22.3, 1.5), (22.3, 5.6), (14.8, 5.6), (16.9, 3.5), (16.9, 1.5), align=None)
    extrude(amount=-CUT_EXTRUDE_3_DEPTH, mode=Mode.SUBTRACT)

    # 草图8 → 切除-拉伸4 (cut)
    with BuildSketch(Plane(origin=(0, 1.5, 0), x_dir=(1, 0, 0), z_dir=(0, 1, 0))):
        with Locations((-18.55, 0)):
            Circle(SKETCH_8_R)
        with Locations((18.55, 0)):
            Circle(SKETCH_8_R)
    extrude(amount=CUT_EXTRUDE_4_DEPTH, mode=Mode.SUBTRACT)

    # 草图9 → 切除-拉伸5 (cut)
    with BuildSketch(Plane(origin=(0, 1.5, 0), x_dir=(1, 0, 0), z_dir=(0, 1, 0))):
        with Locations(Location((-18.55, 0, 0), (0, 0, 180))):
            Circle(SKETCH_9_R)
        with Locations(Location((18.55, 0, 0), (0, 0, 180))):
            Circle(SKETCH_9_R)
    extrude(amount=-CUT_EXTRUDE_5_DEPTH, mode=Mode.SUBTRACT)

    # 草图10 → 切除-拉伸6 (cut)
    with BuildSketch(Plane.XZ):
        Polygon((-14, 5.75), (-5.35, 5.75), (-5.35, 6.55), (5.35, 6.55), (5.35, 5.75), (14, 5.75), (14, -5.75), (-14, -5.75), align=None)
    extrude(amount=-CUT_EXTRUDE_6_DEPTH, mode=Mode.SUBTRACT)

    # 草图11 → 凸台-拉伸5 (add)
    with BuildSketch(Plane.XY.offset(6.55)):
        with Locations((0, 4)):
            Rectangle(SKETCH_11_W, SKETCH_11_H)
    extrude(amount=EXTRUDE_5_DEPTH)

    # 凸台-拉伸6: up to this face of the body (flat: up to its plane)
    extrude_6_end = Plane(part.part.faces().sort_by_distance((-0.75, 12.3, 4.25))[0])
    # 草图12 → 凸台-拉伸6 (add, up to the picked face)
    with BuildSketch(Plane.XY.offset(12.25), mode=Mode.PRIVATE) as extrude_6_sk1:
        with Locations((0, 7.15)):
            Rectangle(SKETCH_12_W, SKETCH_12_H)
    extrude_6_tool1 = split(extrude(extrude_6_sk1.sketch, amount=-EXTRUDE_6_REACH, mode=Mode.PRIVATE), bisect_by=extrude_6_end, keep=Keep.BOTH, mode=Mode.PRIVATE)
    add(extrude_6_tool1.solids().sort_by(Axis((0, 7.15, 12.25), (0, 0, -1)))[0])

    # 草图13 → 切除-拉伸7 (cut)
    with BuildSketch(Plane.XY.offset(12.25)):
        with Locations((0, 7.15)):
            Rectangle(SKETCH_13_W, SKETCH_13_H)
    extrude(amount=-CUT_EXTRUDE_7_DEPTH, mode=Mode.SUBTRACT)

    # 草图14 → 切除-拉伸8 (cut)
    with BuildSketch(Plane.ZY.offset(4)):
        with Locations((10.543297514, 8.10113554)):
            Rectangle(SKETCH_14_W, SKETCH_14_H)
    extrude(amount=-CUT_EXTRUDE_8_DEPTH, mode=Mode.SUBTRACT)

    # 草图15 → 切除-拉伸9 (cut)
    with BuildSketch(Plane(origin=(0, 9.7, 0), x_dir=(1, 0, 0), z_dir=(0, 1, 0))):
        with Locations((-2.427883841, -9.241170147)):
            Rectangle(SKETCH_15_W, SKETCH_15_H)
        with Locations((0, -9.601897215)):
            Rectangle(SKETCH_15_W_2, SKETCH_15_H_2)
        with Locations((2.427883841, -9.241170147)):
            Rectangle(SKETCH_15_W, SKETCH_15_H)
    extrude(amount=-CUT_EXTRUDE_9_DEPTH, mode=Mode.SUBTRACT)

    # 草图16 → 凸台-拉伸7 (add)
    with BuildSketch(Plane.XY.offset(4.55)):
        with Locations((-1.752126005, 7.223491528)):
            Rectangle(SKETCH_16_W, SKETCH_16_H)
        with Locations((-0.021789285, 7.223491528)):
            Rectangle(SKETCH_16_W, SKETCH_16_H)
        with Locations((1.690708913, 7.205653006)):
            Rectangle(SKETCH_16_W_2, SKETCH_16_H_2)
    extrude(amount=EXTRUDE_7_DEPTH)

    # 草图17 → 凸台-拉伸8 (add)
    with BuildSketch(Plane(origin=(0, 11.7, 0), x_dir=(1, 0, 0), z_dir=(0, 1, 0))):
        with Locations(Location((9.523383973, -0.019035269, 0), (0, 0, 90))):
            Circle(SKETCH_17_R)
    extrude(amount=EXTRUDE_8_DEPTH)

    # 圆角3
    fillet_3_edges = [part.edges().sort_by_distance(p)[0] for p in [
        (9.523383973, 20.7, 4.469035269),
    ]]
    fillet(fillet_3_edges, radius=FILLET_3_R)

    # 圆角4
    fillet_4_edges = [part.edges().sort_by_distance(p)[0] for p in [
        (14.016278165, 16.7, -4.5),
        (14.016278165, 16.7, 4.5),
        (5.016278165, 16.7, 4.5),
        (5.016278165, 16.7, -4.5),
    ]]
    fillet(fillet_4_edges, radius=FILLET_4_R)

    # 草图18 → 切除-拉伸10 (cut)
    with BuildSketch(Plane(origin=(0, 11.7, 0), x_dir=(1, 0, 0), z_dir=(0, 1, 0))):
        with Locations((-10.271744936, 0)):
            Rectangle(SKETCH_18_W, SKETCH_18_H)
    extrude(amount=-CUT_EXTRUDE_10_DEPTH, mode=Mode.SUBTRACT)

    # 草图19 → 凸台-拉伸9 (add)
    with BuildSketch(Plane(origin=(0, 9.7, 0), x_dir=(1, 0, 0), z_dir=(0, 1, 0))):
        with Locations(Location((-10.279996895, 0.03221439, 0), (0, 0, 270))):
            Circle(SKETCH_19_R)
    extrude(amount=EXTRUDE_9_DEPTH)

    # 圆角6
    fillet_6_edges = [part.edges().sort_by_distance(p)[0] for p in [
        (-10.279996895, 16.7, -3.53221439),
    ]]
    fillet(fillet_6_edges, radius=FILLET_6_R)

    # 圆角7
    fillet_7_edges = [part.edges().sort_by_distance(p)[0] for p in [
        (-6.421744936, 15.7, -4.5),
        (-6.421744936, 15.7, 4.5),
        (-14.121744936, 15.7, 4.5),
        (-14.121744936, 15.7, -4.5),
    ]]
    fillet(fillet_7_edges, radius=FILLET_7_R)


solid = part.part
